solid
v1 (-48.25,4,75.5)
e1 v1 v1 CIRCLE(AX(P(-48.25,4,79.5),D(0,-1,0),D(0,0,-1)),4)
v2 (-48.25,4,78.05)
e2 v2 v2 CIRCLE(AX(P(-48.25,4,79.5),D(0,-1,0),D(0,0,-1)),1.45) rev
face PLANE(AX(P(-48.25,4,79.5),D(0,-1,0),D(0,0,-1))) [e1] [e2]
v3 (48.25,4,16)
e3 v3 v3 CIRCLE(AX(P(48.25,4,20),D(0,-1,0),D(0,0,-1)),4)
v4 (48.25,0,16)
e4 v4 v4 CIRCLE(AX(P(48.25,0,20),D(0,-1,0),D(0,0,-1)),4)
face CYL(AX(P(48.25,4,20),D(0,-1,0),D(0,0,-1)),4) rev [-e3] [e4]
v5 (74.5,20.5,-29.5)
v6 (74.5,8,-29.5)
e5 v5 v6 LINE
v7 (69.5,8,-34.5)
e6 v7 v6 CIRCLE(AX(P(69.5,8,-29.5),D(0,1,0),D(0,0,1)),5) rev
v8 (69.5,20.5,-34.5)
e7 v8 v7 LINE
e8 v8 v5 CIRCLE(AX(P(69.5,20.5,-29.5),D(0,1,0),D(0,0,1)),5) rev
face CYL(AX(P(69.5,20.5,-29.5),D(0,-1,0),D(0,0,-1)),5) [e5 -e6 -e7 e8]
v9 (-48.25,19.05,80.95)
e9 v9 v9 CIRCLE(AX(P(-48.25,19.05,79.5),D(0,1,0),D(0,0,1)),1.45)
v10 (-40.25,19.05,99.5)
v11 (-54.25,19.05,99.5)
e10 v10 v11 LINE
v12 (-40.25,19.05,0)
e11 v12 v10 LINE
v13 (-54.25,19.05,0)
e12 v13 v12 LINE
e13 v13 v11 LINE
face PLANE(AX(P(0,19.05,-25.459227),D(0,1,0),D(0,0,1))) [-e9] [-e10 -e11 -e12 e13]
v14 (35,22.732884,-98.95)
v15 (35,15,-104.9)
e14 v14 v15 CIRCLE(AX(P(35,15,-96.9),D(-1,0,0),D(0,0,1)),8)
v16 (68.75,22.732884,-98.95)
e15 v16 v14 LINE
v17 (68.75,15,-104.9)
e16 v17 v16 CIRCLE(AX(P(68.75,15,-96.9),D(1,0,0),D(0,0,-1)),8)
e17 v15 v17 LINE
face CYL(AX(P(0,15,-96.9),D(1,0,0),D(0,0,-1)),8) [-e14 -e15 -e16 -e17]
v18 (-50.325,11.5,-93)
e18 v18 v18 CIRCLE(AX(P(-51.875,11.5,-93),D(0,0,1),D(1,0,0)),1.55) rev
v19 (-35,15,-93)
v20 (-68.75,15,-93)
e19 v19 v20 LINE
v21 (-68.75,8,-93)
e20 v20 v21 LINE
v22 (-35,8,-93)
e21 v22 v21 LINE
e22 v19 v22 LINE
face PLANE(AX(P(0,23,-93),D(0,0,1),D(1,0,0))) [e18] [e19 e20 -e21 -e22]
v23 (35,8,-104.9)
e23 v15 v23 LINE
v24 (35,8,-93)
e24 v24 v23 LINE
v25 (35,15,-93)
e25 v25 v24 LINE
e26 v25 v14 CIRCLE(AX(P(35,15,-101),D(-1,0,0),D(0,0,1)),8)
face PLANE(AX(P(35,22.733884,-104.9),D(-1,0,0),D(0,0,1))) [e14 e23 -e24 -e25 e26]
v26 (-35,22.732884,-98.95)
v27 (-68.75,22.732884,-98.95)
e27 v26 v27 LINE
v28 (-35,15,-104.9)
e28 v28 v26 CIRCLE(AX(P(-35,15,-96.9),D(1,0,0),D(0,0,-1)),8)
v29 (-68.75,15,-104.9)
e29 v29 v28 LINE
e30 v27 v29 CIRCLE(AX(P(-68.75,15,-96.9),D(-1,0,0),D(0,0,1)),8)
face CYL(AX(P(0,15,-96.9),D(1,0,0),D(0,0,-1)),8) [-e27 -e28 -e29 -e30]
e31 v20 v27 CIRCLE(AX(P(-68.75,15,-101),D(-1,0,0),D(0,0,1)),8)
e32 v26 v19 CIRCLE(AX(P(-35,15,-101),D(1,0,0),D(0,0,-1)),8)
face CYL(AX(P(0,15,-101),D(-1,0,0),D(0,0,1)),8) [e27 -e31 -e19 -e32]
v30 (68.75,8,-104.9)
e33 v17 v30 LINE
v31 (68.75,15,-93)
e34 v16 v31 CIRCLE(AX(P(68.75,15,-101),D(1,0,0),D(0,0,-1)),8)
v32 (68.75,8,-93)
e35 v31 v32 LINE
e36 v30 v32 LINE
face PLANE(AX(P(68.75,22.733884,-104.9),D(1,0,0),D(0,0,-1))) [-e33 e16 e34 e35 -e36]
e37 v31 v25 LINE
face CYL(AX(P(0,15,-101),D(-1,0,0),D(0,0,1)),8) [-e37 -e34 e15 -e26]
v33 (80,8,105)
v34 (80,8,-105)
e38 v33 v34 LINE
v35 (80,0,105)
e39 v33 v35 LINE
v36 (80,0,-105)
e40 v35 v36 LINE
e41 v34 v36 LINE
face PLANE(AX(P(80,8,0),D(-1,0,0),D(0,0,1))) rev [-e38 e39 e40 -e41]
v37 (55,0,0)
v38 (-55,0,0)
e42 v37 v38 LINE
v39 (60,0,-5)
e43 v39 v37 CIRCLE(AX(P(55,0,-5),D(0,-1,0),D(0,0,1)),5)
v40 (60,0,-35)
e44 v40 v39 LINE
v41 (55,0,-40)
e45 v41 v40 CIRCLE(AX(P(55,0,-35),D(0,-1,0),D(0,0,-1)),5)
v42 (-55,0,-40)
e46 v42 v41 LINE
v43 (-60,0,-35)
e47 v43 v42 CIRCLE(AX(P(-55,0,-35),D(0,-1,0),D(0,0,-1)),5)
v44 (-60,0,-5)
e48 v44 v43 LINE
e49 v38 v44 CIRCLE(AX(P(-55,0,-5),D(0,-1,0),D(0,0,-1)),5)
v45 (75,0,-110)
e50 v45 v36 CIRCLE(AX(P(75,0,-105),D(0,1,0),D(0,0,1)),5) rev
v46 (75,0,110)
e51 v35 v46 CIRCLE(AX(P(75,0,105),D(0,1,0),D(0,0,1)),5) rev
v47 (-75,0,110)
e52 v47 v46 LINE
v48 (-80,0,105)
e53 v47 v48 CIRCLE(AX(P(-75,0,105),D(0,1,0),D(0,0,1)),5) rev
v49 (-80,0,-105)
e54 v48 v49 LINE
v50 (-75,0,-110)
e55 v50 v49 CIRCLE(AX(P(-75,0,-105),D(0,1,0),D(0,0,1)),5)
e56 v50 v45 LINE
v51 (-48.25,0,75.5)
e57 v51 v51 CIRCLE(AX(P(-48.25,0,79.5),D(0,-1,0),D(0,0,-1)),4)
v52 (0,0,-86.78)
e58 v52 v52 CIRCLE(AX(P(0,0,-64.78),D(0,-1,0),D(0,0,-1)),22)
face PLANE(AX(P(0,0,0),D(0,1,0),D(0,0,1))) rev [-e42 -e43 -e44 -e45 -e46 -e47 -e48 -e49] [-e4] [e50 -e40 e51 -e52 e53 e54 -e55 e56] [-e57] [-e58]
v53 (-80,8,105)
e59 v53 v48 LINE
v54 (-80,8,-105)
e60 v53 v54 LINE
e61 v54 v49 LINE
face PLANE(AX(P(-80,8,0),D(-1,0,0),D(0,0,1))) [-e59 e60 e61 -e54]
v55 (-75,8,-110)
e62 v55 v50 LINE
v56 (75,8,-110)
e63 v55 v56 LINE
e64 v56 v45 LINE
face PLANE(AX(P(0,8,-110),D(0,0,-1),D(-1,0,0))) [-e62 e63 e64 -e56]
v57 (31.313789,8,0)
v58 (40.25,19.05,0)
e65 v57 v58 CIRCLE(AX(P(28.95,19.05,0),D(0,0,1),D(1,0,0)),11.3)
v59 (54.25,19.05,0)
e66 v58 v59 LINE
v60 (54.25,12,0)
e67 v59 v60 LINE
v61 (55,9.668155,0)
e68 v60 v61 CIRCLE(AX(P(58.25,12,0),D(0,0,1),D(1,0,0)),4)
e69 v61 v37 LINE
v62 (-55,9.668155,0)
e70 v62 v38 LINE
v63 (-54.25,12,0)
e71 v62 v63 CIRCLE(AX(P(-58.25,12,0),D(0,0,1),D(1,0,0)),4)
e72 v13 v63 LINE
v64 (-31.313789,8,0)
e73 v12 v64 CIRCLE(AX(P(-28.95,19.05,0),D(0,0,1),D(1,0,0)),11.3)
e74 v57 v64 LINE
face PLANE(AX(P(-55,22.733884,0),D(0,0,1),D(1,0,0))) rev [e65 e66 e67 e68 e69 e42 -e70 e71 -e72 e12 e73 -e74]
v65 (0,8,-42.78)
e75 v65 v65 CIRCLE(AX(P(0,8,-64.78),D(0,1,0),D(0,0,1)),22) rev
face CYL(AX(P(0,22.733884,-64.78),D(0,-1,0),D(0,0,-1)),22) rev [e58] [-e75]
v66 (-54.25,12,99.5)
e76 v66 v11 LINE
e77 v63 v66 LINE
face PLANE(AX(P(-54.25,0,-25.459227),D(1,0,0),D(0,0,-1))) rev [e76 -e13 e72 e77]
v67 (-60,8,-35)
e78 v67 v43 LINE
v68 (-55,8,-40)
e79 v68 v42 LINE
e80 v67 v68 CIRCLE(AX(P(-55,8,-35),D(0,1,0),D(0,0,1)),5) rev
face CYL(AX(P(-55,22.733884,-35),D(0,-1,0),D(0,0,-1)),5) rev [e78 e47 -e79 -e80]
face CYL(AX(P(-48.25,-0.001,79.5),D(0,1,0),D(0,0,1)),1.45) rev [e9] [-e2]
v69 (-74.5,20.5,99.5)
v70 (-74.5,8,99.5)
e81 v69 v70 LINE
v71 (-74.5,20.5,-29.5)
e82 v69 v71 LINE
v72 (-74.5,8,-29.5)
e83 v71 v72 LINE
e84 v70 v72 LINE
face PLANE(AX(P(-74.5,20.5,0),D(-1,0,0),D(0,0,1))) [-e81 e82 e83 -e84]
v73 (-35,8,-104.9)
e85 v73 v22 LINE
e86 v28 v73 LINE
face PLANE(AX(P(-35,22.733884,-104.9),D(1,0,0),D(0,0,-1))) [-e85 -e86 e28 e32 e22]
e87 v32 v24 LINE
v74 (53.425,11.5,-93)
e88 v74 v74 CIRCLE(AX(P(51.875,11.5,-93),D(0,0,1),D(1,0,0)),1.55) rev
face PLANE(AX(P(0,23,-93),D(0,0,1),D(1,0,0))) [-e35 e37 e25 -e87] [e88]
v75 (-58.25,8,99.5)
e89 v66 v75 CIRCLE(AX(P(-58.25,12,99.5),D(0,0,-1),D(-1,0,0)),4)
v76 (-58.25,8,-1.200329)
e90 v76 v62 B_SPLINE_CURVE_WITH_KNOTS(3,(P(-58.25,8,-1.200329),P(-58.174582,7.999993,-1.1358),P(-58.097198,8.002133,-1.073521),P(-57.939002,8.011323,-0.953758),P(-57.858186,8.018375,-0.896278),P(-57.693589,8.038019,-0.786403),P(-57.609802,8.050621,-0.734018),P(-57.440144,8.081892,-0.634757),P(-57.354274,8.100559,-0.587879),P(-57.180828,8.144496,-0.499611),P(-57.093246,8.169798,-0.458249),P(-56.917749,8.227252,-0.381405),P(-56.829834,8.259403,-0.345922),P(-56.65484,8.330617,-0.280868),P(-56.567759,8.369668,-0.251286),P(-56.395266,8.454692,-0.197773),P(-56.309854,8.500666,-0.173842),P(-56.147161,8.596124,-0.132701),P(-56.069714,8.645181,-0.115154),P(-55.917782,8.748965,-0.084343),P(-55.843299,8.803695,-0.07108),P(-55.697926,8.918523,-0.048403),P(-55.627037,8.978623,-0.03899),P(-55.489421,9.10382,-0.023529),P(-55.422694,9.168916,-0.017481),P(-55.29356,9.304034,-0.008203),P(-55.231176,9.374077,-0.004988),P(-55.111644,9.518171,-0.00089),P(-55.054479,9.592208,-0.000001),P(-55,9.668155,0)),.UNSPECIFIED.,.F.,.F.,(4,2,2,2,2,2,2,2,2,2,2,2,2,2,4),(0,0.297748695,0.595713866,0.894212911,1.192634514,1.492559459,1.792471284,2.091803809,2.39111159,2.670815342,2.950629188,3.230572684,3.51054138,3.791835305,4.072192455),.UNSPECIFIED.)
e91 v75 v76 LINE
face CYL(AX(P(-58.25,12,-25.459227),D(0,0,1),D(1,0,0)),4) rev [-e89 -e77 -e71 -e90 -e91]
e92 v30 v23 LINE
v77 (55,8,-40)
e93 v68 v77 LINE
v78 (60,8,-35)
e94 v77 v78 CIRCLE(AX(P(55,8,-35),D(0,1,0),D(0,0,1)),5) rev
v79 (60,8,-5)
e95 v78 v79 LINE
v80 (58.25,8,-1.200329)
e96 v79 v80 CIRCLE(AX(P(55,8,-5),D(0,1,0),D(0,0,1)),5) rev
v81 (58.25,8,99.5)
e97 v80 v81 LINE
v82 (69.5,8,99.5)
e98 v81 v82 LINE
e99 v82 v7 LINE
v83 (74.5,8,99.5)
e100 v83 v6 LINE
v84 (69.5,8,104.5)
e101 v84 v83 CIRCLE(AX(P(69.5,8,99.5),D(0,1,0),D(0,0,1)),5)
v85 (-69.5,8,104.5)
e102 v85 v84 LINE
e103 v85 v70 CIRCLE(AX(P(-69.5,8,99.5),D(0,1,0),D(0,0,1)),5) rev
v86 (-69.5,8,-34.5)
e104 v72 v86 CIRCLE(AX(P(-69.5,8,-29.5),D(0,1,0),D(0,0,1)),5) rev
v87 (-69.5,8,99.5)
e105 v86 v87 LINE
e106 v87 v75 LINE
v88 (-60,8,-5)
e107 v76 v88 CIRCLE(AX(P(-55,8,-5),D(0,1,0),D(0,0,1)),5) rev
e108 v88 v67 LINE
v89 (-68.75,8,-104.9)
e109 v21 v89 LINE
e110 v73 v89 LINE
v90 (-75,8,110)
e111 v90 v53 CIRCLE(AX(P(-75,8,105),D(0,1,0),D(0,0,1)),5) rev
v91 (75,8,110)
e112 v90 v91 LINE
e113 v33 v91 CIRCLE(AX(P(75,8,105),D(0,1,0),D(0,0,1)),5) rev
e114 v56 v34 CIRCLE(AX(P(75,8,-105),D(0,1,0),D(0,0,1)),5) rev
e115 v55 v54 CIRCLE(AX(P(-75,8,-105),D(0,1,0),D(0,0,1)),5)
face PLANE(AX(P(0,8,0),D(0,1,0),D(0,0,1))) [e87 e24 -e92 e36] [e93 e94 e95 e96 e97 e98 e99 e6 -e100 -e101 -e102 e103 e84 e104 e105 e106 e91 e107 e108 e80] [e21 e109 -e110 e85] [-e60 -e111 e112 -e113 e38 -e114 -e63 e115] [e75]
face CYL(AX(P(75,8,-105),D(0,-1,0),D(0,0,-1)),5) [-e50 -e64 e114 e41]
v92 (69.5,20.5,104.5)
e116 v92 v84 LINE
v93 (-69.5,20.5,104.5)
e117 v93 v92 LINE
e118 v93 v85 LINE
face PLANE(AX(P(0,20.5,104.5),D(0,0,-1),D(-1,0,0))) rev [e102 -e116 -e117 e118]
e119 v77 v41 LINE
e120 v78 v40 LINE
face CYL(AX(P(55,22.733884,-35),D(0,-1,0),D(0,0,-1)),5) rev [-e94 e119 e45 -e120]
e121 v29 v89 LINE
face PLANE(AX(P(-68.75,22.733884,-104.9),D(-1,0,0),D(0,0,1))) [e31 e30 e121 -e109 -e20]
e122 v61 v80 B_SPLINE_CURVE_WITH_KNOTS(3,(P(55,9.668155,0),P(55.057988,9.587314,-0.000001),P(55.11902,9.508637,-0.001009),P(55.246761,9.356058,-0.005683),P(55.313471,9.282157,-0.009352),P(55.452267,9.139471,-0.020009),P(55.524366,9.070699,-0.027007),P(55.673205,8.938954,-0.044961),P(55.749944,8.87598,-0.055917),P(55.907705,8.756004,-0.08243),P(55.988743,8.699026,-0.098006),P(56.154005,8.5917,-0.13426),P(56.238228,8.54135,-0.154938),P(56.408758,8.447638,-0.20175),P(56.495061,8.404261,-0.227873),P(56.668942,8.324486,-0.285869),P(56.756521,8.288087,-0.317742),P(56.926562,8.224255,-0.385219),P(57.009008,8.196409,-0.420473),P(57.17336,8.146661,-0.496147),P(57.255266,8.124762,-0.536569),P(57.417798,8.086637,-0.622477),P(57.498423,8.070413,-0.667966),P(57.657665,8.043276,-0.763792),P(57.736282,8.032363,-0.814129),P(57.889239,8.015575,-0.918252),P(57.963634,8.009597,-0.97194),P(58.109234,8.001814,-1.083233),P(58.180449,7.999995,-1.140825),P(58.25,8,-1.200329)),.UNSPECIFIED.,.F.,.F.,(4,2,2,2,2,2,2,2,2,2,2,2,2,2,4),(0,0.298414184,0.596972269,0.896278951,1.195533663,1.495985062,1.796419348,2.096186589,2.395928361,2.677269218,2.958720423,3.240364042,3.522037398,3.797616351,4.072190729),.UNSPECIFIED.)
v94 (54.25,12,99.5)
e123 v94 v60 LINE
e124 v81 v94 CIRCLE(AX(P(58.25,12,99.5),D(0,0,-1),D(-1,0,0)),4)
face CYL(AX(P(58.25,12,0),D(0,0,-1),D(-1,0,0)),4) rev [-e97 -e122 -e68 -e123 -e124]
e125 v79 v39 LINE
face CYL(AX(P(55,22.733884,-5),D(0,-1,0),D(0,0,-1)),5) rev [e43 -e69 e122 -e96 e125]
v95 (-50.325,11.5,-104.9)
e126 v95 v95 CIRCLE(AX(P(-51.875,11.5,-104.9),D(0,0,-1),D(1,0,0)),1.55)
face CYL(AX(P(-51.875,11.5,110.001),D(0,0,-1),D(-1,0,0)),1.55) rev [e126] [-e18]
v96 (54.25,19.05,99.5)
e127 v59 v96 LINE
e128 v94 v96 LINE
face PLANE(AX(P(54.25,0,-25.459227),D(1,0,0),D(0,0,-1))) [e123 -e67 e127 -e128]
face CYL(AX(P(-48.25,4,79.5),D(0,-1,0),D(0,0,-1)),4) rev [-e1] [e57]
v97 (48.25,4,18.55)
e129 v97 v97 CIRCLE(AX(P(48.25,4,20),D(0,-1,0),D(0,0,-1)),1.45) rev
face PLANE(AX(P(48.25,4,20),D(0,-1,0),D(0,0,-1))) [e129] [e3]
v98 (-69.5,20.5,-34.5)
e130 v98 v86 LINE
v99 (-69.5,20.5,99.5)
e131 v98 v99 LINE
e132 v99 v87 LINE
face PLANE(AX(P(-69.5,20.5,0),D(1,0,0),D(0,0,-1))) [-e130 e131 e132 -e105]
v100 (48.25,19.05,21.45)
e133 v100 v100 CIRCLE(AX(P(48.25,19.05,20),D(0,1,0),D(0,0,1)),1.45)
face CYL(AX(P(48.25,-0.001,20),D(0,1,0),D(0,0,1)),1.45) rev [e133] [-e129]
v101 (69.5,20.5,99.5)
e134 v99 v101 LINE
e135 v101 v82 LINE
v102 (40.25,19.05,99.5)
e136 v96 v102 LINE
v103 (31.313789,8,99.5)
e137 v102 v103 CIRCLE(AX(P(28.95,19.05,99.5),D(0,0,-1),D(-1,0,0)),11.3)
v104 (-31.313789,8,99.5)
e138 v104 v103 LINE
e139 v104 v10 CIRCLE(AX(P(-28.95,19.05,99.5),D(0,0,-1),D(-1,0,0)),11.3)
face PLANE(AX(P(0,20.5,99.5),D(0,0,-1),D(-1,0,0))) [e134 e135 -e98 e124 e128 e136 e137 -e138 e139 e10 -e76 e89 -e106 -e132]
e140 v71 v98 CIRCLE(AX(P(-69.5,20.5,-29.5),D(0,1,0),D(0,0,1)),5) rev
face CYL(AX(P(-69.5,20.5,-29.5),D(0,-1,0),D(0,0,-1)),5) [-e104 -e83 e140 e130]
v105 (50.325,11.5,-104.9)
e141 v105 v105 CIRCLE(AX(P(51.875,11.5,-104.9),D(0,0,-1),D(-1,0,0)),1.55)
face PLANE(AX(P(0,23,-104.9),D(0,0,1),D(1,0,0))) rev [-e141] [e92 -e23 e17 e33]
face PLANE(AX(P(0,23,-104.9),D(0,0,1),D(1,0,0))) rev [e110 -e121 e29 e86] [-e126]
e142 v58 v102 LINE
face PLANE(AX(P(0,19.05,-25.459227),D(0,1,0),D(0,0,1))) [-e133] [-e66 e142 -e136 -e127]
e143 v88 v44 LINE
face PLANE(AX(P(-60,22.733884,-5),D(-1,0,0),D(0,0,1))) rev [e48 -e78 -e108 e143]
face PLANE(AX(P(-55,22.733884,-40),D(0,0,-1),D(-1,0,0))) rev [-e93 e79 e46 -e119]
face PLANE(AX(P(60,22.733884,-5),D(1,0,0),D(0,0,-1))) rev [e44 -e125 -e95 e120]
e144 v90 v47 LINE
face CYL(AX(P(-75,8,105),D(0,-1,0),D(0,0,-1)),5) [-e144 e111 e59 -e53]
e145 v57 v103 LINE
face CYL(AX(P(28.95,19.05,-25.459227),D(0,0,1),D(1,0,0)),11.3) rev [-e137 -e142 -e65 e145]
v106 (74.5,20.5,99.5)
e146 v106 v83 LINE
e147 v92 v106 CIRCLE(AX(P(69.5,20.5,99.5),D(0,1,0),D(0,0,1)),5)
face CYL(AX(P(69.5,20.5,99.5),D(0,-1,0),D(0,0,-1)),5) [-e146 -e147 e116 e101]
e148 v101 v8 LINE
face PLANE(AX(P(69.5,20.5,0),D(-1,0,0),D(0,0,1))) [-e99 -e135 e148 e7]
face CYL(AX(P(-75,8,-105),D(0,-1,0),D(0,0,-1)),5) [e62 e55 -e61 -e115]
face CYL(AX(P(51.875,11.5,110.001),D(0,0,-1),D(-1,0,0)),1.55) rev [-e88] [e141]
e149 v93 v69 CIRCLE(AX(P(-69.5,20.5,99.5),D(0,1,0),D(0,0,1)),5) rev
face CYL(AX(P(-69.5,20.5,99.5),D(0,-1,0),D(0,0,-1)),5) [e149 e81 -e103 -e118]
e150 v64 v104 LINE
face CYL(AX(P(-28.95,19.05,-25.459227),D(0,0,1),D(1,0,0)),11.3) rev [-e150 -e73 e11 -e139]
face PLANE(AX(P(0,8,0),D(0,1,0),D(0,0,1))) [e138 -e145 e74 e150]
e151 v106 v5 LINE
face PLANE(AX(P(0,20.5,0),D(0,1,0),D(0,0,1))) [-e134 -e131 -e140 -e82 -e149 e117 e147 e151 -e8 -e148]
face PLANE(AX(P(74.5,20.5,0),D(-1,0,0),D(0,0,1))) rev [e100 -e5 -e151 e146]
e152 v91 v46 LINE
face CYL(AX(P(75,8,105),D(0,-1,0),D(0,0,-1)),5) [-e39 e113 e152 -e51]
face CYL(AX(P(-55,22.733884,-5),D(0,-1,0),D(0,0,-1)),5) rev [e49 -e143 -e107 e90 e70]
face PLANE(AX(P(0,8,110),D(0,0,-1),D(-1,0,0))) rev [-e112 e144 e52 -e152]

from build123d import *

# Parameters (mm, degrees)
BOSS_EXTRUDE1_DEPTH = 8
BOSS_EXTRUDE2_START = 8
SKETCH3_7_W         = 139.5
SKETCH3_7_H         = 11.9
BOSS_EXTRUDE2_DEPTH = 15
FILLET1_R           = 8
CUT_EXTRUDE1_REACH  = 139.901
BOSS_EXTRUDE3_DEPTH = 12.5
BOSS_EXTRUDE4_DEPTH = 99.5
CUT_EXTRUDE3_REACH  = 138.81
SKETCH9_W           = 70
SKETCH9_H           = 11.9
SKETCH9_W_2         = 1
CUT_EXTRUDE5_REACH  = 139.901
SKETCH11_R          = 22
FILLET2_R           = 4
CUT_EXTRUDE6_REACH  = 139.342
SKETCH12_R          = 1.45
SKETCH13_R          = 4
CUT_EXTRUDE7_DEPTH  = 4
CUT_EXTRUDE2_REACH  = 232.432
SKETCH6_R           = 1.55


with BuildPart() as part:
    # Sketch3 → Boss-Extrude1 (new body)
    with BuildSketch(Plane(origin=(0, 0, 0), x_dir=(1, 0, 0), z_dir=(0, 1, 0))):
        with BuildLine():
            Line((-75, 110), (75, 110))
            ThreePointArc((75, 110), (78.535533906, 108.535533906), (80, 105))
            Line((80, 105), (80, -105))
            ThreePointArc((80, -105), (78.535533906, -108.535533906), (75, -110))
            Line((75, -110), (-75, -110))
            ThreePointArc((-75, -110), (-78.535533906, -108.535533906), (-80, -105))
            Line((-80, -105), (-80, 105))
            ThreePointArc((-80, 105), (-78.535533906, 108.535533906), (-75, 110))
        make_face()
    extrude(amount=BOSS_EXTRUDE1_DEPTH)

    # Sketch3<7> → Boss-Extrude2 (add)
    with BuildSketch(Plane(origin=(0, 0, 0), x_dir=(1, 0, 0), z_dir=(0, 1, 0)).offset(BOSS_EXTRUDE2_START)):
        with Locations((0, 98.95)):
            Rectangle(SKETCH3_7_W, SKETCH3_7_H)
    extrude(amount=BOSS_EXTRUDE2_DEPTH)

    # Fillet1
    # the kernel refuses this fillet: 8 mm, written as the material it takes off along each edge
    with BuildSketch(Plane(origin=(89.75, 23, -93), x_dir=(0, -1, 0), z_dir=(-1, 0, 0)), Plane(origin=(-89.75, 23, -104.9), x_dir=(0, -1, 0), z_dir=(1, 0, 0))) as fillet1_piece_1:
        with BuildLine():
            CenterArc((FILLET1_R, -FILLET1_R), FILLET1_R, 90, 90)
            Line((0, -FILLET1_R), (0, 0))
            Line((0, 0), (FILLET1_R, 0))
        make_face()
    extrude(amount=179.5, mode=Mode.SUBTRACT)

    # Sketch4 → Cut-Extrude1 (cut, up to next)
    with BuildSketch(Plane.XZ, mode=Mode.PRIVATE) as cut_extrude1_sk1:
        with BuildLine():
            Line((-55, 0), (55, 0))
            ThreePointArc((55, 0), (58.535533906, -1.464466094), (60, -5))
            Line((60, -5), (60, -35))
            ThreePointArc((60, -35), (58.535533906, -38.535533906), (55, -40))
            Line((55, -40), (-55, -40))
            ThreePointArc((-55, -40), (-58.535533906, -38.535533906), (-60, -35))
            Line((-60, -35), (-60, -5))
            ThreePointArc((-60, -5), (-58.535533906, -1.464466094), (-55, 0))
        make_face()
    cut_extrude1_tool1 = extrude(cut_extrude1_sk1.sketch, amount=-CUT_EXTRUDE1_REACH, mode=Mode.PRIVATE) & part.part
    add(cut_extrude1_tool1.solids().sort_by_distance((0, 0, -20))[0], mode=Mode.SUBTRACT)

    # Sketch5 → Boss-Extrude3 (add)
    with BuildSketch(Plane(origin=(0, 8, 0), x_dir=(1, 0, 0), z_dir=(0, 1, 0))):
        with BuildLine():
            ThreePointArc((-69.5, -104.5), (-73.035533906, -103.035533906), (-74.5, -99.5))
            Line((-74.5, -99.5), (-74.5, 29.5))
            ThreePointArc((-74.5, 29.5), (-73.035533906, 33.035533906), (-69.5, 34.5))
            Line((-69.5, 34.5), (-69.5, -99.5))
            Line((-69.5, -99.5), (69.5, -99.5))
            Line((69.5, -99.5), (69.5, 34.5))
            ThreePointArc((69.5, 34.5), (73.035533906, 33.035533906), (74.5, 29.5))
            Line((74.5, 29.5), (74.5, -99.5))
            ThreePointArc((74.5, -99.5), (73.035533906, -103.035533906), (69.5, -104.5))
            Line((69.5, -104.5), (-69.5, -104.5))
        make_face()
    extrude(amount=BOSS_EXTRUDE3_DEPTH)

    # Sketch8 → Boss-Extrude4 (add)
    with BuildSketch(Plane(origin=(0, 0, 99.5), x_dir=(-1, 0, 0), z_dir=(0, 0, -1))):
        with BuildLine():
            ThreePointArc((-31.313789331, 8), (-37.73637637, 11.944397261), (-40.25, 19.05))
            Line((-40.25, 19.05), (-54.25, 19.05))
            Line((-54.25, 19.05), (-54.25, 4.75))
            Line((-54.25, 4.75), (-28.95, 4.75))
            ThreePointArc((-28.95, 4.75), (-33.770529017, 5.586995135), (-38.026756028, 8))
            Line((-38.026756028, 8), (-31.313789331, 8))
        make_face()
        with BuildLine():
            ThreePointArc((40.25, 19.05), (37.73637637, 11.944397261), (31.313789331, 8))
            Line((31.313789331, 8), (38.026756028, 8))
            ThreePointArc((38.026756028, 8), (33.770529017, 5.586995135), (28.95, 4.75))
            Line((28.95, 4.75), (54.25, 4.75))
            Line((54.25, 4.75), (54.25, 19.05))
            Line((54.25, 19.05), (40.25, 19.05))
        make_face()
    extrude(amount=BOSS_EXTRUDE4_DEPTH)

    # Sketch9 → Cut-Extrude3 (cut, up to next)
    with BuildSketch(Plane(origin=(0, 8, 0), x_dir=(1, 0, 0), z_dir=(0, 1, 0)), mode=Mode.PRIVATE) as cut_extrude3_sk1:
        with Locations((0, 98.95)):
            Rectangle(SKETCH9_W, SKETCH9_H)
    cut_extrude3_tool1 = extrude(cut_extrude3_sk1.sketch, amount=CUT_EXTRUDE3_REACH, mode=Mode.PRIVATE) & part.part
    # Sketch9 → Cut-Extrude3 (cut, up to next)
    with BuildSketch(Plane(origin=(0, 8, 0), x_dir=(1, 0, 0), z_dir=(0, 1, 0)), mode=Mode.PRIVATE) as cut_extrude3_sk2:
        with Locations((-69.25, 98.95)):
            Rectangle(SKETCH9_W_2, SKETCH9_H)
    cut_extrude3_tool2 = extrude(cut_extrude3_sk2.sketch, amount=CUT_EXTRUDE3_REACH, mode=Mode.PRIVATE) & part.part
    # Sketch9 → Cut-Extrude3 (cut, up to next)
    with BuildSketch(Plane(origin=(0, 8, 0), x_dir=(1, 0, 0), z_dir=(0, 1, 0)), mode=Mode.PRIVATE) as cut_extrude3_sk3:
        with Locations((69.25, 98.95)):
            Rectangle(SKETCH9_W_2, SKETCH9_H)
    cut_extrude3_tool3 = extrude(cut_extrude3_sk3.sketch, amount=CUT_EXTRUDE3_REACH, mode=Mode.PRIVATE) & part.part
    add(cut_extrude3_tool1.solids().sort_by_distance((0, 8, -98.95))[0], mode=Mode.SUBTRACT)
    add(cut_extrude3_tool2.solids().sort_by_distance((-69.25, 8, -98.95))[0], mode=Mode.SUBTRACT)
    add(cut_extrude3_tool3.solids().sort_by_distance((69.25, 8, -98.95))[0], mode=Mode.SUBTRACT)

    # Sketch11 → Cut-Extrude5 (cut, up to next)
    with BuildSketch(Plane.XZ, mode=Mode.PRIVATE) as cut_extrude5_sk1:
        with Locations(Location((0, -64.78, 0), (0, 0, 270))):
            Circle(SKETCH11_R)
    cut_extrude5_tool1 = extrude(cut_extrude5_sk1.sketch, amount=-CUT_EXTRUDE5_REACH, mode=Mode.PRIVATE) & part.part
    add(cut_extrude5_tool1.solids().sort_by_distance((0, 0, -64.78))[0], mode=Mode.SUBTRACT)

    # Fillet2
    fillet2_edges = [part.edges().sort_by_distance(p)[0] for p in [
        (54.25, 8, 49.75),
        (-54.25, 8, 49.75),
    ]]
    fillet(fillet2_edges, radius=FILLET2_R)

    # Sketch12 → Cut-Extrude6 (cut, up to next)
    with BuildSketch(Plane(origin=(0, 19.05, 0), x_dir=(1, 0, 0), z_dir=(0, 1, 0)), mode=Mode.PRIVATE) as cut_extrude6_sk1:
        with Locations(Location((48.25, -20, 0), (0, 0, 270))):
            Circle(SKETCH12_R)
    cut_extrude6_tool1 = extrude(cut_extrude6_sk1.sketch, amount=-CUT_EXTRUDE6_REACH, mode=Mode.PRIVATE) & part.part
    # Sketch12 → Cut-Extrude6 (cut, up to next)
    with BuildSketch(Plane(origin=(0, 19.05, 0), x_dir=(1, 0, 0), z_dir=(0, 1, 0)), mode=Mode.PRIVATE) as cut_extrude6_sk2:
        with Locations(Location((-48.25, -79.5, 0), (0, 0, 270))):
            Circle(SKETCH12_R)
    cut_extrude6_tool2 = extrude(cut_extrude6_sk2.sketch, amount=-CUT_EXTRUDE6_REACH, mode=Mode.PRIVATE) & part.part
    add(cut_extrude6_tool1.solids().sort_by_distance((48.25, 19.05, 20))[0], mode=Mode.SUBTRACT)
    add(cut_extrude6_tool2.solids().sort_by_distance((-48.25, 19.05, 79.5))[0], mode=Mode.SUBTRACT)

    # Sketch13 → Cut-Extrude7 (cut)
    with BuildSketch(Plane.XZ):
        with Locations(Location((-48.25, 79.5, 0), (0, 0, 270))):
            Circle(SKETCH13_R)
        with Locations(Location((48.25, 20, 0), (0, 0, 270))):
            Circle(SKETCH13_R)
    extrude(amount=-CUT_EXTRUDE7_DEPTH, mode=Mode.SUBTRACT)

    # Sketch6 → Cut-Extrude2 (cut, up to next)
    with BuildSketch(Plane(origin=(0, 0, -104.9), x_dir=(-1, 0, 0), z_dir=(0, 0, -1)), mode=Mode.PRIVATE) as cut_extrude2_sk1:
        with Locations((-51.875, 11.5)):
            Circle(SKETCH6_R)
    cut_extrude2_tool1 = extrude(cut_extrude2_sk1.sketch, amount=-CUT_EXTRUDE2_REACH, mode=Mode.PRIVATE) & part.part
    # Sketch6 → Cut-Extrude2 (cut, up to next)
    with BuildSketch(Plane(origin=(0, 0, -104.9), x_dir=(-1, 0, 0), z_dir=(0, 0, -1)), mode=Mode.PRIVATE) as cut_extrude2_sk2:
        with Locations(Location((51.875, 11.5, 0), (0, 0, 180))):
            Circle(SKETCH6_R)
    cut_extrude2_tool2 = extrude(cut_extrude2_sk2.sketch, amount=-CUT_EXTRUDE2_REACH, mode=Mode.PRIVATE) & part.part
    add(cut_extrude2_tool1.solids().sort_by_distance((51.875, 11.5, -104.9))[0], mode=Mode.SUBTRACT)
    add(cut_extrude2_tool2.solids().sort_by_distance((-51.875, 11.5, -104.9))[0], mode=Mode.SUBTRACT)


solid = part.part
